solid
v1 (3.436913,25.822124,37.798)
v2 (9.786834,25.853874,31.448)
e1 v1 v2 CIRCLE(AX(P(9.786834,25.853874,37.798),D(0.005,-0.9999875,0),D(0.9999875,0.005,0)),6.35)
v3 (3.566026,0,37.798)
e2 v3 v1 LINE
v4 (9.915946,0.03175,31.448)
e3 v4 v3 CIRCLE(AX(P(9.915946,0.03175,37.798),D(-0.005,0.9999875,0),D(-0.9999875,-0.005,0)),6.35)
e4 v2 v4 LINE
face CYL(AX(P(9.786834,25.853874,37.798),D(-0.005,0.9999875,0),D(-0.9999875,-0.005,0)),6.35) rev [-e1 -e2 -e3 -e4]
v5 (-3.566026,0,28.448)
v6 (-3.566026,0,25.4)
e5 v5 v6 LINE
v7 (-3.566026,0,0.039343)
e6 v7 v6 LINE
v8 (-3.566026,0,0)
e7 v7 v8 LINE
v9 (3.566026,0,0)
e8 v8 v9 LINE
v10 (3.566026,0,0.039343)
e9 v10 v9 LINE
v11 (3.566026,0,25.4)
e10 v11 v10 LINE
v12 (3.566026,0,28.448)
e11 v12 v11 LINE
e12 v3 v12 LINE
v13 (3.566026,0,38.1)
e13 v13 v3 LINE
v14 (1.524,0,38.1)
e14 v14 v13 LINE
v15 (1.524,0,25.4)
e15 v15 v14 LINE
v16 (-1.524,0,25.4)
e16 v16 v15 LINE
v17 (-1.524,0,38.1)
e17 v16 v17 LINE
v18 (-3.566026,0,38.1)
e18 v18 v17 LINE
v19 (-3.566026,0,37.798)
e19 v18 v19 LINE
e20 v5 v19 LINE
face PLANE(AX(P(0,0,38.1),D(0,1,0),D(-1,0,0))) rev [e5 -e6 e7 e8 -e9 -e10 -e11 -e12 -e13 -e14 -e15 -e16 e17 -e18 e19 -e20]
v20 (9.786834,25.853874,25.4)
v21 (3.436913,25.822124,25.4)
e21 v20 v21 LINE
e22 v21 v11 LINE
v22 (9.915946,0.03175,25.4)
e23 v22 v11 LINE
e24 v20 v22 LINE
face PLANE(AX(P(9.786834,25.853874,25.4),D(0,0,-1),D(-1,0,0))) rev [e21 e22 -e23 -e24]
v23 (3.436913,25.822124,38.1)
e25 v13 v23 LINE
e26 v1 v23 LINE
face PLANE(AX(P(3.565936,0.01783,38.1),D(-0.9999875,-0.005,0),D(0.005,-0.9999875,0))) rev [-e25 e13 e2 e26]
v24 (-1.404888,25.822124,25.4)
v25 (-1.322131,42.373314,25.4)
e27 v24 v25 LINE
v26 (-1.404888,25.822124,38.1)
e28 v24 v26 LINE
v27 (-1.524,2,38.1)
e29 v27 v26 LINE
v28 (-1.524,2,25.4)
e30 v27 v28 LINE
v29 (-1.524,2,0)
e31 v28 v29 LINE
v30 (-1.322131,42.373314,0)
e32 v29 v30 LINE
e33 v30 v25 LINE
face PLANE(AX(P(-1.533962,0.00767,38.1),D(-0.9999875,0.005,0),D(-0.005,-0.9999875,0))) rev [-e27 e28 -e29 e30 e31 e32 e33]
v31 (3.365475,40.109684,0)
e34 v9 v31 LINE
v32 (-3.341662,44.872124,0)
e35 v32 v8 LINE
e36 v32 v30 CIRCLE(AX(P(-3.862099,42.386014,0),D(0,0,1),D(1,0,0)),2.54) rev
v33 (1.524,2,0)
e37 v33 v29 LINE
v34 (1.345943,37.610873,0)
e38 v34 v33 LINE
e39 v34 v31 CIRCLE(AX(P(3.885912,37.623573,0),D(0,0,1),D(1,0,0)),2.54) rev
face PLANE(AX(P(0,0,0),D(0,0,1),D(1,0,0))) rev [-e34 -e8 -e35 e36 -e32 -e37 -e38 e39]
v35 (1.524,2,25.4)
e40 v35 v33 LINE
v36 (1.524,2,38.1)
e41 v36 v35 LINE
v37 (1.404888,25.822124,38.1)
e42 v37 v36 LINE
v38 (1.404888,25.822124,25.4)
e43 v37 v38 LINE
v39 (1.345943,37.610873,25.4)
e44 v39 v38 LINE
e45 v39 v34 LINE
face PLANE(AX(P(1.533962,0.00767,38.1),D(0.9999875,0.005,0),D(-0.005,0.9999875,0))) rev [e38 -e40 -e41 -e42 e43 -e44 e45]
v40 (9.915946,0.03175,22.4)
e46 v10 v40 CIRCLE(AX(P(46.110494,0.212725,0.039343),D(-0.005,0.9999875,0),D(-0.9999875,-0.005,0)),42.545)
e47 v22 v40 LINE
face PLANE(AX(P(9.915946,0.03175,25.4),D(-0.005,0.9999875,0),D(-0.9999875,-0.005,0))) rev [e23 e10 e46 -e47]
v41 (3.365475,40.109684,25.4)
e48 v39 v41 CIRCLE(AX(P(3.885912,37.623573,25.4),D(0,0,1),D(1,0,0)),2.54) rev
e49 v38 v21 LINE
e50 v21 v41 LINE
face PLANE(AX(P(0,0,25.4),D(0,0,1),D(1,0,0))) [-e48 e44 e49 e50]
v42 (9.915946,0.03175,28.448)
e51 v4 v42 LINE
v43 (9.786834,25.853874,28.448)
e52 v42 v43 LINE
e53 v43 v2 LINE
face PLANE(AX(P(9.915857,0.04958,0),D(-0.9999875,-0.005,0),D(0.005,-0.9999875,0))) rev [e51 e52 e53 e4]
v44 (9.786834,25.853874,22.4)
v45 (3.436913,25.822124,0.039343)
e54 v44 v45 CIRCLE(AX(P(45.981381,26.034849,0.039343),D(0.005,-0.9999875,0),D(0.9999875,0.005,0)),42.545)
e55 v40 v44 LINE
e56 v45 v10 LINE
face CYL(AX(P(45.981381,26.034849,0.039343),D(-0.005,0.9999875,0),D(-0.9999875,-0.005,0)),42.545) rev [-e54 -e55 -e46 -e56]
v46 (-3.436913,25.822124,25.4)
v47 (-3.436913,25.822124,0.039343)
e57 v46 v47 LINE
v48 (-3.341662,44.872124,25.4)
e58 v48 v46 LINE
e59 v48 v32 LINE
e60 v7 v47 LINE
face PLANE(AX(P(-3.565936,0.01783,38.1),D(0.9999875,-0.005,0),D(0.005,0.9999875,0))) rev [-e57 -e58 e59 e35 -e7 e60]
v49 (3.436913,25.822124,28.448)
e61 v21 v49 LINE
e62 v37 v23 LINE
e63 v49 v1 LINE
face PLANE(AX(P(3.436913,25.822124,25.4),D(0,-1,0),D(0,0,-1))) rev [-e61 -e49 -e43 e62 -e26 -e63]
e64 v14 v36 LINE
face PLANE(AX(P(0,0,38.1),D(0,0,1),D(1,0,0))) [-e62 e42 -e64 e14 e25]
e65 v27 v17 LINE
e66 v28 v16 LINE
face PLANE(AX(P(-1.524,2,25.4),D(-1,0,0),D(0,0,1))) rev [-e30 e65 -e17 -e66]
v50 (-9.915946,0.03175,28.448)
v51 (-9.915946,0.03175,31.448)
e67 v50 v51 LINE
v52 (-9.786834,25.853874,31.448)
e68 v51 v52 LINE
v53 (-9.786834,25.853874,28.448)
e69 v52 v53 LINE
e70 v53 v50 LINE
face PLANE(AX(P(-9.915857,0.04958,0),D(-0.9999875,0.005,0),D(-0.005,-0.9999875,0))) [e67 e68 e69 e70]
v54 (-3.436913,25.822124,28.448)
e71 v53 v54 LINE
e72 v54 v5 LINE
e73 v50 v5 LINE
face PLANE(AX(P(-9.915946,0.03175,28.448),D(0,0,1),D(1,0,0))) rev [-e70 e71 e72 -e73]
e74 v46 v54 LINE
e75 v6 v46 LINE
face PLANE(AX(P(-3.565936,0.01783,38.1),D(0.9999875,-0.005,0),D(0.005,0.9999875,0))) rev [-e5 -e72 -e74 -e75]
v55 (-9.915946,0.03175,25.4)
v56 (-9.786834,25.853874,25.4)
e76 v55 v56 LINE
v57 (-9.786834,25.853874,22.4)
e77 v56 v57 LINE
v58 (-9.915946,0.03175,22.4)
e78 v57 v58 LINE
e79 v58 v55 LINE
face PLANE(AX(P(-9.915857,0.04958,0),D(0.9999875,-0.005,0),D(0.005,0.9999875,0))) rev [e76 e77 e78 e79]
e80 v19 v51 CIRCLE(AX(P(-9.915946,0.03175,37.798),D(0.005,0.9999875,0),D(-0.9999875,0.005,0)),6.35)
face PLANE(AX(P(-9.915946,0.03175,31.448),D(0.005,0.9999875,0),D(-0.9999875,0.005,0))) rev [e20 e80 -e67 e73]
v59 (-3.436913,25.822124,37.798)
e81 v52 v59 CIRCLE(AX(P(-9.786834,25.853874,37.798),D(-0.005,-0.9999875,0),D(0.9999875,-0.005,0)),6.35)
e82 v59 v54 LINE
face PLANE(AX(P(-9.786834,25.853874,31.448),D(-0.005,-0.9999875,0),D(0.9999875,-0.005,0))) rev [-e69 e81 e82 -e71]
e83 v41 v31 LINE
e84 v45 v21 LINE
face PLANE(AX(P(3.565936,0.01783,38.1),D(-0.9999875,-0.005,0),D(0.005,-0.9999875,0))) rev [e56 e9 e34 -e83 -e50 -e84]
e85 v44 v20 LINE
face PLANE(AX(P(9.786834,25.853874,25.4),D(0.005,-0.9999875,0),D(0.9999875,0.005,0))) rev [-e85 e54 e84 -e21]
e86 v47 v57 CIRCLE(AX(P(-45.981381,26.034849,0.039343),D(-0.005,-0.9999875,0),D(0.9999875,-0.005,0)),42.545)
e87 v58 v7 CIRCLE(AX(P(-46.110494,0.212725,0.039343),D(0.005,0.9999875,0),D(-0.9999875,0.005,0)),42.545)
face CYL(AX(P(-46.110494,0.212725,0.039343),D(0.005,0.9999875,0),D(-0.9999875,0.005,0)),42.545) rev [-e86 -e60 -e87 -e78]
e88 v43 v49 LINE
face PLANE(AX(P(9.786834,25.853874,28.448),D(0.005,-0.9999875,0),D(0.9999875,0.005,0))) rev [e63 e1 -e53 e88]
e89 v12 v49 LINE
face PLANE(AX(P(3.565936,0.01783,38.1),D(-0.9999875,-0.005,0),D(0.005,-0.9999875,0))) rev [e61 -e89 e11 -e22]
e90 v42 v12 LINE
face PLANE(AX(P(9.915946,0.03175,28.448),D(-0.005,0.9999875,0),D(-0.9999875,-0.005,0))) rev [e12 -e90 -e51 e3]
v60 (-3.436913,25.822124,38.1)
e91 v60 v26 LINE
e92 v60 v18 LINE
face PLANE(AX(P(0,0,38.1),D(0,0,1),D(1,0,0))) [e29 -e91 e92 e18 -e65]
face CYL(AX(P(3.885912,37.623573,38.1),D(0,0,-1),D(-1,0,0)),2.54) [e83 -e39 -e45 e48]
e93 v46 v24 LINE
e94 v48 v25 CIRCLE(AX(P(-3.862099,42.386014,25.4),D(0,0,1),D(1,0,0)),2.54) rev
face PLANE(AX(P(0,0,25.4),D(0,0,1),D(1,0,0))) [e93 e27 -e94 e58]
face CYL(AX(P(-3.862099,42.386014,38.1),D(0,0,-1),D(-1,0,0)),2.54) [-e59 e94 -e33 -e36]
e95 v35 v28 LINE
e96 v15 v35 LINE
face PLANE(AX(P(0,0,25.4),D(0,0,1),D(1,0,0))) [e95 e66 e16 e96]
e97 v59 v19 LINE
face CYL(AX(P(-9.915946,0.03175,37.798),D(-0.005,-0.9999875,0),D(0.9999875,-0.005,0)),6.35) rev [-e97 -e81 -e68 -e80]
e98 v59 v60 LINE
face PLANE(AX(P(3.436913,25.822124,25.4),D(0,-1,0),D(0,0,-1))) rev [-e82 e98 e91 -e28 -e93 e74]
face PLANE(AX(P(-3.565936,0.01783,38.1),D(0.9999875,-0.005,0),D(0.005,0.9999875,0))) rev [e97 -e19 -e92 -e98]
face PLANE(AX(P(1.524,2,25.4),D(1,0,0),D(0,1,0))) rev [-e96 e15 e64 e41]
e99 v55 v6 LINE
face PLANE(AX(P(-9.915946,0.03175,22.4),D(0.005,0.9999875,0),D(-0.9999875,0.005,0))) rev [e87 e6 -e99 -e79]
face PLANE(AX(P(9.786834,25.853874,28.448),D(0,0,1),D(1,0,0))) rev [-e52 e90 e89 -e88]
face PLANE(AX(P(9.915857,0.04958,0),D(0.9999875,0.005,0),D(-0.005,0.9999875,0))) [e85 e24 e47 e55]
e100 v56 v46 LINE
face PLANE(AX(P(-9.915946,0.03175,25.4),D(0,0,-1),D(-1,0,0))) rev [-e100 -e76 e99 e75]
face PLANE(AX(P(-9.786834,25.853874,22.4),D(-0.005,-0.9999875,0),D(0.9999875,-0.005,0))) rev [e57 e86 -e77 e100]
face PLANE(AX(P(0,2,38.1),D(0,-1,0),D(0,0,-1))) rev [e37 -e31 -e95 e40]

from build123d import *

# Parameters (mm, degrees)
BOSS_EXTRUDE1_DEPTH = 38.1
FILLET1_R           = 2.54
SKETCH2_W           = 3.048
SKETCH2_H           = 2
SKETCH2_W_2         = 6.87382658
SKETCH2_H_2         = 19.05
CUT_EXTRUDE1_DEPTH  = 12.7
SKETCH3_W           = 3
SKETCH3_H           = 25.822446998
BOSS_EXTRUDE2_DEPTH = 6.35
SKETCH4_W           = 3
SKETCH4_H           = 25.822446998
BOSS_EXTRUDE4_DEPTH = 6.35
FILLET3_R           = 42.545
FILLET4_R           = 6.35


# Some blends are built 0.0001 mm under size
with BuildPart() as part:
    # Sketch1 → Boss-Extrude1 (new body)
    with BuildSketch(Plane.XY):
        Polygon((-1.3335, 40.099523747), (-3.3654746, 40.109683747), (-3.566025525, 0), (3.566025525, 0), (3.3654746, 40.109683747), (1.3335, 40.099523747), (1.524, 2), (-1.524, 2), align=None)
        Polygon((-1.3096875, 44.861964215), (-1.3335, 40.099523747), (-3.3654746, 40.109683747), (-3.3416621, 44.872124215), align=None)
    extrude(amount=BOSS_EXTRUDE1_DEPTH)

    # Fillet1
    # the kernel refuses this fillet: 2.54 mm, written as the material it takes off along each edge
    with BuildSketch(Plane(origin=(1.3335, 40.099523747, -6.221703947), x_dir=(0.005000000000000079, -0.999987499921874, 0), z_dir=(0, 0, 1))) as fillet1_piece_1:
        with BuildLine():
            CenterArc((2.488681579, 2.54), FILLET1_R, 191.536959033, 78.463040967)
            Line((0, 2.032), (-0.049773632, 2.02184))
            ThreePointArc((-0.049773632, 2.02184), (-0.0508, 1.016), (-0.0508, 0))
            Line((-0.0508, 0), (0, -0.0508))
            Line((0, -0.0508), (2.488681579, -0.0508))
            Line((2.488681579, -0.0508), (2.488681579, 0))
        make_face()
    extrude(amount=50.543407893, mode=Mode.SUBTRACT)
    with BuildSketch(Plane(origin=(-1.3096875, 44.861964215, -6.221703947), x_dir=(-0.005000000000000297, -0.999987499921874, 0), z_dir=(0, 0, 1))) as fillet1_piece_2:
        with BuildLine():
            CenterArc((2.488681579, -2.54), FILLET1_R, 90, 78.463040967)
            Line((0, -2.032), (-0.049773632, -2.02184))
            ThreePointArc((-0.049773632, -2.02184), (-0.0508, -1.016), (-0.0508, 0))
            Line((-0.0508, 0), (0, 0.0508))
            Line((0, 0.0508), (2.488681579, 0.0508))
            Line((2.488681579, 0.0508), (2.488681579, 0))
        make_face()
    extrude(amount=50.543407893, mode=Mode.SUBTRACT)

    # Sketch2 → Cut-Extrude1 (cut)
    with BuildSketch(Plane.XY.offset(38.1)):
        with Locations((0, 1)):
            Rectangle(SKETCH2_W, SKETCH2_H)
        with Locations((0, 35.347124215)):
            Rectangle(SKETCH2_W_2, SKETCH2_H_2)
    extrude(amount=-CUT_EXTRUDE1_DEPTH, mode=Mode.SUBTRACT)

    # Sketch3 → Boss-Extrude2 (add)
    with BuildSketch(Plane(origin=(3.565936375, 0.017829905, 0), x_dir=(0, 0, -1), z_dir=(0.9999874999218742, 0.004999999999999631, 0))):
        with Locations((-23.9, 12.893393371)):
            Rectangle(SKETCH3_W, SKETCH3_H)
        with Locations((-29.948, 12.893393371)):
            Rectangle(SKETCH3_W, SKETCH3_H)
    extrude(amount=BOSS_EXTRUDE2_DEPTH)

    # Sketch4 → Boss-Extrude4 (add)
    with BuildSketch(Plane(origin=(-3.565936375, 0.017829905, 0), x_dir=(0, 0, 1), z_dir=(-0.9999874999218742, 0.004999999999999631, 0))):
        with Locations((29.948, 12.893393371)):
            Rectangle(SKETCH4_W, SKETCH4_H)
        with Locations((23.9, 12.893393371)):
            Rectangle(SKETCH4_W, SKETCH4_H)
    extrude(amount=BOSS_EXTRUDE4_DEPTH)

    # Fillet3
    # the kernel refuses this fillet: 42.545 mm, written as the material it adds along each edge
    with BuildSketch(Plane(origin=(3.43691329, 25.822124215, 22.4), x_dir=(0, 0, -1), z_dir=(0.004999999999999631, -0.9999874999218742, 0))) as fillet3_piece_1:
        with BuildLine():
            CenterArc((22.360657414, 42.545), FILLET3_R, 238.292930672, 31.707069328)
            Line((0, 6.35), (0, 0))
            Line((0, 0), (22.360657414, 0))
        make_face()
    extrude(amount=25.822446998)
    with BuildSketch(Plane(origin=(-3.43691329, 25.822124215, 22.4), x_dir=(0, 0, -1), z_dir=(-0.004999999999999631, -0.9999874999218742, 0))) as fillet3_piece_2:
        with BuildLine():
            CenterArc((22.360657414, -42.545), FILLET3_R, 90, 31.707069328)
            Line((0, -6.35), (0, 0))
            Line((0, 0), (22.360657414, 0))
        make_face()
    extrude(amount=25.822446998)

    # Fillet4
    fillet4_edges = [part.edges().sort_by_distance(p)[0] for p in [
        (3.501469408, 12.911062108, 31.448),
        (-3.501469408, 12.911062108, 31.448),
    ]]
    fillet(fillet4_edges, radius=FILLET4_R - 0.0001)  # a hair under: the kernel refuses the full size


solid = part.part
